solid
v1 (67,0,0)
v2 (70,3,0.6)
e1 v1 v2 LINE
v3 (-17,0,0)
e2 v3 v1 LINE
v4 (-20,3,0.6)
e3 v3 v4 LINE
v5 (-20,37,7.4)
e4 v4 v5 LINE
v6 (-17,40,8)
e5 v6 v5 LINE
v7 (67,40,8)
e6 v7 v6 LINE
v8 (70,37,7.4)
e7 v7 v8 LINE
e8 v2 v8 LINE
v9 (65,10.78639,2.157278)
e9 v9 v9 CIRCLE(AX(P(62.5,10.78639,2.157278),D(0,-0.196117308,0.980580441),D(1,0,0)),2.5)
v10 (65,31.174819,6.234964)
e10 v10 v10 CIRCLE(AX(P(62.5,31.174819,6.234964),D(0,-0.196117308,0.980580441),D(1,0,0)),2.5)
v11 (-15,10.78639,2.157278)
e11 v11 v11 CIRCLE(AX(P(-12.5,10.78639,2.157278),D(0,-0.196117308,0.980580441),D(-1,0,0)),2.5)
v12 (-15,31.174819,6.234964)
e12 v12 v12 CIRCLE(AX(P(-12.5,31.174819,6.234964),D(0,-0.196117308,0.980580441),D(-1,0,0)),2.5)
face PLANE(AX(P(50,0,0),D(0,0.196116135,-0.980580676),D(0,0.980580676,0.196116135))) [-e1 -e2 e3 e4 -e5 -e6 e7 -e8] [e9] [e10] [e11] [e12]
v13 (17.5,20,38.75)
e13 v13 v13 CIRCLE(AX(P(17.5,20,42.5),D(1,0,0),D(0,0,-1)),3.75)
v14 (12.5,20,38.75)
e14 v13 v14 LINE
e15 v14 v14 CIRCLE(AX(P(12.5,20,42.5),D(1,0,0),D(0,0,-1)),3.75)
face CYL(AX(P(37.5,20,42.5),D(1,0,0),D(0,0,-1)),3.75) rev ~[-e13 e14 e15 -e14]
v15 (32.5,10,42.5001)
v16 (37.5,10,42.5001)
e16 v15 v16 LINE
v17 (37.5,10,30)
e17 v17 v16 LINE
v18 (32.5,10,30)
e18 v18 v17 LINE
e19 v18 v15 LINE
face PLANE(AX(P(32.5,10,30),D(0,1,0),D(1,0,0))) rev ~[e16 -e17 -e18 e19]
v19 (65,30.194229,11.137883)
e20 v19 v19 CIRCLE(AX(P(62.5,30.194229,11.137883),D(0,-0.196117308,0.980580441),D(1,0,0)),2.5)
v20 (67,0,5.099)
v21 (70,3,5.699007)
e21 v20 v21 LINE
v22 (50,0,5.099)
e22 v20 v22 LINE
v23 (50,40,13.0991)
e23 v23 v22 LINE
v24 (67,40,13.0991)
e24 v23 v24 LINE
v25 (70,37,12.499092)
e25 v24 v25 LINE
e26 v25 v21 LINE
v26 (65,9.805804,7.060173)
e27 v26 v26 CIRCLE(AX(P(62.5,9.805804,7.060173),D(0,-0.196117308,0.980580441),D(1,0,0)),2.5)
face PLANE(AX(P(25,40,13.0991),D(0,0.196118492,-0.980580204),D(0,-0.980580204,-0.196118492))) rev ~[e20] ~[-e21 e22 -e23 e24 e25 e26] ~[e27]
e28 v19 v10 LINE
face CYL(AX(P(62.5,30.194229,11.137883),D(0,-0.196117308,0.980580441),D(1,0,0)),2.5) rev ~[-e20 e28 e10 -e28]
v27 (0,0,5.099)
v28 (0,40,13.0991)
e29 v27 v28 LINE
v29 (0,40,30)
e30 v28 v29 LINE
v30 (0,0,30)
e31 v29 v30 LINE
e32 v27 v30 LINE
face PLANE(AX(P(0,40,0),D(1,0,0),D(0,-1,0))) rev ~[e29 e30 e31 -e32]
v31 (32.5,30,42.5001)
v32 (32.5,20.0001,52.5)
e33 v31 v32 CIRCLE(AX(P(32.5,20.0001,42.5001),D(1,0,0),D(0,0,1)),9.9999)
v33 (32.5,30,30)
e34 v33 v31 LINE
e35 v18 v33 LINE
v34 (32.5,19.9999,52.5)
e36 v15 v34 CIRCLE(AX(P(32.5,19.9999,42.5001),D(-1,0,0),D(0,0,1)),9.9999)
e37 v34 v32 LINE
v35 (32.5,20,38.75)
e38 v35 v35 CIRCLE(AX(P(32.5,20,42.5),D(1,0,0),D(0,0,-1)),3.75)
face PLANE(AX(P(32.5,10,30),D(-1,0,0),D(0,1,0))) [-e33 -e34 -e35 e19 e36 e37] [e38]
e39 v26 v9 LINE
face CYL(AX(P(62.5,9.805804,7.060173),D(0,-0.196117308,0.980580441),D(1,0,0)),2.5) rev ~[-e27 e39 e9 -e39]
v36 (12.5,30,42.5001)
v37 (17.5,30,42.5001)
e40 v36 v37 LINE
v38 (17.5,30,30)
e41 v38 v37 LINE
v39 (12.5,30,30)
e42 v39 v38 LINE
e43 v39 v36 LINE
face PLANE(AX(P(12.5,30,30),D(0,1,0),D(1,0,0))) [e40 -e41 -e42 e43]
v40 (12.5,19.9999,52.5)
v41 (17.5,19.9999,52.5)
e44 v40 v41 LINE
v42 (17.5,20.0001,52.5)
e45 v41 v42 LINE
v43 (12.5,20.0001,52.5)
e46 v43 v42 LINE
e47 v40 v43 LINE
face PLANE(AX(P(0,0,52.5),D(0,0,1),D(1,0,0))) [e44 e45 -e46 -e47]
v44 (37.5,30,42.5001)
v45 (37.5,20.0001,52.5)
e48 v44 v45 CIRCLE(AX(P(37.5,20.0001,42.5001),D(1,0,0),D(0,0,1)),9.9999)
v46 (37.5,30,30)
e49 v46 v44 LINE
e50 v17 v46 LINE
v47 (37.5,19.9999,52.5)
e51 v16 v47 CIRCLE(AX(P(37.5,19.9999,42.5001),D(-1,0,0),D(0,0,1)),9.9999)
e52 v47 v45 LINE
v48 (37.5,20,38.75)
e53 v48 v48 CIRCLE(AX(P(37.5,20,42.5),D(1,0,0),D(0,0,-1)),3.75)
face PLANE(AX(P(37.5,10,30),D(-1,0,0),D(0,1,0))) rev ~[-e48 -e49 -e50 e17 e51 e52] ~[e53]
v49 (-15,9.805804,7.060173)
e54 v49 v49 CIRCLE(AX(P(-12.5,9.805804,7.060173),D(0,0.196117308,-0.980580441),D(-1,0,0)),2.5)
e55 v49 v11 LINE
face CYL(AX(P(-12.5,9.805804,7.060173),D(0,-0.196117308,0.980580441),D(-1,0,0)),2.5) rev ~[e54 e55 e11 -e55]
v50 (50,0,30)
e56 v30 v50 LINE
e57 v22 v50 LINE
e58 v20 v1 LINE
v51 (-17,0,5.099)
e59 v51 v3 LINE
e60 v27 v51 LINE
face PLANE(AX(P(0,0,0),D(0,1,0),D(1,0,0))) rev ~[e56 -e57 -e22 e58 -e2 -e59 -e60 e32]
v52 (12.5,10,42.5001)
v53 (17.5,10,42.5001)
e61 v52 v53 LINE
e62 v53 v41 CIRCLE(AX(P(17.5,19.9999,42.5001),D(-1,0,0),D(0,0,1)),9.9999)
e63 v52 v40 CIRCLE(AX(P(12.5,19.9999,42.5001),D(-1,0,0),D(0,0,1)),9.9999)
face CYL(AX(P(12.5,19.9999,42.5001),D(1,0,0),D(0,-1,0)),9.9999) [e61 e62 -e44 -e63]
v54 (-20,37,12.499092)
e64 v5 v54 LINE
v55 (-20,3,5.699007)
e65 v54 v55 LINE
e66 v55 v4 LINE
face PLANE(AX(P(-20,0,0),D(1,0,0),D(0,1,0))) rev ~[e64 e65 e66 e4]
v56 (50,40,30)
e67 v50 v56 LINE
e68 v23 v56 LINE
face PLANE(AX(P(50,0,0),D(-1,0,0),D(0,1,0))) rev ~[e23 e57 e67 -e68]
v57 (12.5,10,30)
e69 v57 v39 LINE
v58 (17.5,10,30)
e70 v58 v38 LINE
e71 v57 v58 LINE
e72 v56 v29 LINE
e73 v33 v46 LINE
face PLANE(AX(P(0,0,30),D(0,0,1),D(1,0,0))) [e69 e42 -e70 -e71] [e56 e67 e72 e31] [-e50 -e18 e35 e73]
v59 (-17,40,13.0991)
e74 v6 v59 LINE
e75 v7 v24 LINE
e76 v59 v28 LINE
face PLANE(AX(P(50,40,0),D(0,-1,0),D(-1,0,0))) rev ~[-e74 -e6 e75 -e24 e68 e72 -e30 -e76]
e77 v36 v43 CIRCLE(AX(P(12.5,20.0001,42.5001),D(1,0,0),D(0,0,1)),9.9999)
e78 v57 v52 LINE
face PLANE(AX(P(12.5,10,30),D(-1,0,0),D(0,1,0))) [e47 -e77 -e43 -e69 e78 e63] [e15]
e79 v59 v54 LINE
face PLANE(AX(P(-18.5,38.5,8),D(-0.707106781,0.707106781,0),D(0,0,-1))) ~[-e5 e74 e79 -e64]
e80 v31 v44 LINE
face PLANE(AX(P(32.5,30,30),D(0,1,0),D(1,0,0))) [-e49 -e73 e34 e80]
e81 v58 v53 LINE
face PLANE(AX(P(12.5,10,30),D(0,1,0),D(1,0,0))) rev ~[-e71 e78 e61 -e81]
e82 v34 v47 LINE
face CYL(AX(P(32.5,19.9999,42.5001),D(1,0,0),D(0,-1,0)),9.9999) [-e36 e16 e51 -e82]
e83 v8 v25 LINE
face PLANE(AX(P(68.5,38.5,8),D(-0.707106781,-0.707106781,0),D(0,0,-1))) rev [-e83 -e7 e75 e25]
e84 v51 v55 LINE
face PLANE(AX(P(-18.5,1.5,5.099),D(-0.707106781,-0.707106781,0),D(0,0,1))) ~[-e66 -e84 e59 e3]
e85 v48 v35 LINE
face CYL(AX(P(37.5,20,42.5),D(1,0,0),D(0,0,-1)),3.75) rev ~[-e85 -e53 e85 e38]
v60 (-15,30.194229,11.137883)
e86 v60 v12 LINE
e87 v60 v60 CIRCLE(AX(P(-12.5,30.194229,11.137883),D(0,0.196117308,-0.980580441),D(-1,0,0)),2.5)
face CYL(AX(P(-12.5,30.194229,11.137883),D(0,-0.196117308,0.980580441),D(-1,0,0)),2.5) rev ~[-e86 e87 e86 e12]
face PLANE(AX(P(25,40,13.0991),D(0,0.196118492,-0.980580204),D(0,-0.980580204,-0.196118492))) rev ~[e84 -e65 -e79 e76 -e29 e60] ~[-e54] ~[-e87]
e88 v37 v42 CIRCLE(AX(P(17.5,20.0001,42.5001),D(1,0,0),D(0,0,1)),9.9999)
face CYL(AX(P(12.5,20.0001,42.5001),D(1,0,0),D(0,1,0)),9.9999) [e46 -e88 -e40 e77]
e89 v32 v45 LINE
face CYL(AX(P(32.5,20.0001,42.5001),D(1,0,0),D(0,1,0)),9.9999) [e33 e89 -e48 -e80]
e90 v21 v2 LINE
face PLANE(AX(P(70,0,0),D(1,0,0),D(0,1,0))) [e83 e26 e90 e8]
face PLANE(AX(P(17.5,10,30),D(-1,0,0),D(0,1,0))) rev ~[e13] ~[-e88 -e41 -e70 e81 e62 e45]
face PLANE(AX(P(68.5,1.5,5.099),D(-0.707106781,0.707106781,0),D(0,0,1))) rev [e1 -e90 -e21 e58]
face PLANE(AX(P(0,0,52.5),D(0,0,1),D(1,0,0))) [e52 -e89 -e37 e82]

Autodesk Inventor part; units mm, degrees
ref_plane "XZ Plane" through (0, 0, 0) normal (0, 1, 0) x (-1, 0, 0)
ref_plane "XY Plane" through (0, 0, 0) normal (0, 0, 1) x (1, 0, 0)
ref_plane "Work Plane1" through (25, 0, 0) normal (1, 0, 0) x (0, 1, 0)
sketch "Sketch1" plane through (0, 0, 0) normal (0, 0, 1) x (1, 0, 0)
  line L0 (0, 0) -> (50, 0)
  line L1 (50, 0) -> (50, 40)
  line L2 (50, 40) -> (0, 40)
  line L3 (0, 40) -> (0, 0)
  dimension "d0" = 50
  dimension "d1" = 40
extrude "Extrusion1" add sketch "Sketch1" along normal blind 30
sketch "Sketch3" plane through (50, 0, 0) normal (1, 0, 0) x (0, 0, -1)
  line L0 (0, 0) -> (-8, 40)
  line L1 (0, 40) -> (-30, 40) projected
  line L2 (0, 0) -> (40.7922, 0) construction
  arc A0 (0, 40) -> (-8, 40) centre (-4, 20) ccw
  line L3 (0, 0) -> (0, 40) projected
  line L4 (0, 40) -> (0, 0)
  dimension "d7" = 101.31
extrude "Extrusion3" cut sketch "Sketch3" against normal through all contours L0 L1 L3
sketch "Sketch4" plane through (0, 0, 30) normal (0, 0, 1) x (1, 0, 0)
  line L0 (0, 0) -> (50, 0) construction
  line L1 (25, 0) -> (25, 40) construction
  line L2 (50, 40) -> (0, 40) construction
  line L3 (0, 40) -> (0, 0) construction
  line L4 (0, 20) -> (50, 20) construction
  line L5 (50, 0) -> (50, 40) construction
  line L6 (17.5, 10) -> (17.5, 30)
  line L7 (32.5, 10) -> (32.5, 30)
  line L8 (12.5, 10) -> (12.5, 30)
  line L9 (37.5, 10) -> (37.5, 30)
  line L10 (12.5, 10) -> (17.5, 10)
  line L11 (32.5, 10) -> (37.5, 10)
  line L12 (12.5, 30) -> (17.5, 30)
  line L13 (32.5, 30) -> (37.5, 30)
  dimension "d12" = 7.5
  dimension "d13" = 7.5
  dimension "d14" = 5
  dimension "d15" = 20
  dimension "d16" = 5
  dimension "d17" = 20
  dimension "d18" = 10
  dimension "d19" = 10
extrude "Extrusion4" add sketch "Sketch4" along normal blind 22.5
fillet "Fillet1" radius 10 4 edges at (15, 10, 52.5) (15, 30, 52.5) (35, 10, 52.5) (35, 30, 52.5)
sketch "Sketch5" plane through (37.5, 10, 30) normal (1, 0, 0) x (0, 0, -1)
  arc A0 (-12.5, 20) -> (-12.5, 0) centre (-12.5, 10) ccw projected
  line L0 (-12.5, 0) -> (-12.5, 20) construction
  circle A1 centre (-12.5, 10) radius 3.75
  point P0 (30, -10)
  dimension "d23" = 7.5
extrude "Extrusion5" cut sketch "Sketch5" against normal through all
sketch "Sketch6" plane through (25, 0, 0) normal (1, 0, 0) x (0, 1, 0)
  line L0 (40, 8) -> (40, 30) projected
  line L1 (0, 0) -> (40, 8)
  line L2 (40, 8) -> (40, 13.0991)
  line L3 (40, 13.0991) -> (0, 5.099)
  line L4 (0, 5.099) -> (0, 0)
  dimension "d27" = 5
extrude "Extrusion6" add sketch "Sketch6" along normal mid plane 90
sketch "Sketch7" plane through (50, 0, 5.099) normal (0, -0.1961173, 0.9805804) x (1, 0, 0)
  circle A0 centre (12.5, 10) radius 2.5
  circle A1 centre (12.5, 30.7922) radius 2.5
  line L0 (20, 40.7922) -> (20, 0) projected
  line L1 (0, 0) -> (20, 0) projected
  line L2 (0, 40.7922) -> (20, 40.7922) projected
  point P0 (-50, -1)
  dimension "d30" = 5
  dimension "d31" = 5
  dimension "d32" = 7.5
  dimension "d33" = 7.5
  dimension "d34" = 10
  dimension "d35" = 10
extrude "Extrusion7" cut sketch "Sketch7" against normal through all
mirror "Mirror1" about plane through (25, 0, 0) normal (1, 0, 0) of "Extrusion7"
chamfer "Chamfer1" distance 3 angle 45 4 edges at (70, 0, 2.5495) (70, 40, 10.5496) (-20, 0, 2.5495) (-20, 40, 10.5496)
properties part number "Base"
